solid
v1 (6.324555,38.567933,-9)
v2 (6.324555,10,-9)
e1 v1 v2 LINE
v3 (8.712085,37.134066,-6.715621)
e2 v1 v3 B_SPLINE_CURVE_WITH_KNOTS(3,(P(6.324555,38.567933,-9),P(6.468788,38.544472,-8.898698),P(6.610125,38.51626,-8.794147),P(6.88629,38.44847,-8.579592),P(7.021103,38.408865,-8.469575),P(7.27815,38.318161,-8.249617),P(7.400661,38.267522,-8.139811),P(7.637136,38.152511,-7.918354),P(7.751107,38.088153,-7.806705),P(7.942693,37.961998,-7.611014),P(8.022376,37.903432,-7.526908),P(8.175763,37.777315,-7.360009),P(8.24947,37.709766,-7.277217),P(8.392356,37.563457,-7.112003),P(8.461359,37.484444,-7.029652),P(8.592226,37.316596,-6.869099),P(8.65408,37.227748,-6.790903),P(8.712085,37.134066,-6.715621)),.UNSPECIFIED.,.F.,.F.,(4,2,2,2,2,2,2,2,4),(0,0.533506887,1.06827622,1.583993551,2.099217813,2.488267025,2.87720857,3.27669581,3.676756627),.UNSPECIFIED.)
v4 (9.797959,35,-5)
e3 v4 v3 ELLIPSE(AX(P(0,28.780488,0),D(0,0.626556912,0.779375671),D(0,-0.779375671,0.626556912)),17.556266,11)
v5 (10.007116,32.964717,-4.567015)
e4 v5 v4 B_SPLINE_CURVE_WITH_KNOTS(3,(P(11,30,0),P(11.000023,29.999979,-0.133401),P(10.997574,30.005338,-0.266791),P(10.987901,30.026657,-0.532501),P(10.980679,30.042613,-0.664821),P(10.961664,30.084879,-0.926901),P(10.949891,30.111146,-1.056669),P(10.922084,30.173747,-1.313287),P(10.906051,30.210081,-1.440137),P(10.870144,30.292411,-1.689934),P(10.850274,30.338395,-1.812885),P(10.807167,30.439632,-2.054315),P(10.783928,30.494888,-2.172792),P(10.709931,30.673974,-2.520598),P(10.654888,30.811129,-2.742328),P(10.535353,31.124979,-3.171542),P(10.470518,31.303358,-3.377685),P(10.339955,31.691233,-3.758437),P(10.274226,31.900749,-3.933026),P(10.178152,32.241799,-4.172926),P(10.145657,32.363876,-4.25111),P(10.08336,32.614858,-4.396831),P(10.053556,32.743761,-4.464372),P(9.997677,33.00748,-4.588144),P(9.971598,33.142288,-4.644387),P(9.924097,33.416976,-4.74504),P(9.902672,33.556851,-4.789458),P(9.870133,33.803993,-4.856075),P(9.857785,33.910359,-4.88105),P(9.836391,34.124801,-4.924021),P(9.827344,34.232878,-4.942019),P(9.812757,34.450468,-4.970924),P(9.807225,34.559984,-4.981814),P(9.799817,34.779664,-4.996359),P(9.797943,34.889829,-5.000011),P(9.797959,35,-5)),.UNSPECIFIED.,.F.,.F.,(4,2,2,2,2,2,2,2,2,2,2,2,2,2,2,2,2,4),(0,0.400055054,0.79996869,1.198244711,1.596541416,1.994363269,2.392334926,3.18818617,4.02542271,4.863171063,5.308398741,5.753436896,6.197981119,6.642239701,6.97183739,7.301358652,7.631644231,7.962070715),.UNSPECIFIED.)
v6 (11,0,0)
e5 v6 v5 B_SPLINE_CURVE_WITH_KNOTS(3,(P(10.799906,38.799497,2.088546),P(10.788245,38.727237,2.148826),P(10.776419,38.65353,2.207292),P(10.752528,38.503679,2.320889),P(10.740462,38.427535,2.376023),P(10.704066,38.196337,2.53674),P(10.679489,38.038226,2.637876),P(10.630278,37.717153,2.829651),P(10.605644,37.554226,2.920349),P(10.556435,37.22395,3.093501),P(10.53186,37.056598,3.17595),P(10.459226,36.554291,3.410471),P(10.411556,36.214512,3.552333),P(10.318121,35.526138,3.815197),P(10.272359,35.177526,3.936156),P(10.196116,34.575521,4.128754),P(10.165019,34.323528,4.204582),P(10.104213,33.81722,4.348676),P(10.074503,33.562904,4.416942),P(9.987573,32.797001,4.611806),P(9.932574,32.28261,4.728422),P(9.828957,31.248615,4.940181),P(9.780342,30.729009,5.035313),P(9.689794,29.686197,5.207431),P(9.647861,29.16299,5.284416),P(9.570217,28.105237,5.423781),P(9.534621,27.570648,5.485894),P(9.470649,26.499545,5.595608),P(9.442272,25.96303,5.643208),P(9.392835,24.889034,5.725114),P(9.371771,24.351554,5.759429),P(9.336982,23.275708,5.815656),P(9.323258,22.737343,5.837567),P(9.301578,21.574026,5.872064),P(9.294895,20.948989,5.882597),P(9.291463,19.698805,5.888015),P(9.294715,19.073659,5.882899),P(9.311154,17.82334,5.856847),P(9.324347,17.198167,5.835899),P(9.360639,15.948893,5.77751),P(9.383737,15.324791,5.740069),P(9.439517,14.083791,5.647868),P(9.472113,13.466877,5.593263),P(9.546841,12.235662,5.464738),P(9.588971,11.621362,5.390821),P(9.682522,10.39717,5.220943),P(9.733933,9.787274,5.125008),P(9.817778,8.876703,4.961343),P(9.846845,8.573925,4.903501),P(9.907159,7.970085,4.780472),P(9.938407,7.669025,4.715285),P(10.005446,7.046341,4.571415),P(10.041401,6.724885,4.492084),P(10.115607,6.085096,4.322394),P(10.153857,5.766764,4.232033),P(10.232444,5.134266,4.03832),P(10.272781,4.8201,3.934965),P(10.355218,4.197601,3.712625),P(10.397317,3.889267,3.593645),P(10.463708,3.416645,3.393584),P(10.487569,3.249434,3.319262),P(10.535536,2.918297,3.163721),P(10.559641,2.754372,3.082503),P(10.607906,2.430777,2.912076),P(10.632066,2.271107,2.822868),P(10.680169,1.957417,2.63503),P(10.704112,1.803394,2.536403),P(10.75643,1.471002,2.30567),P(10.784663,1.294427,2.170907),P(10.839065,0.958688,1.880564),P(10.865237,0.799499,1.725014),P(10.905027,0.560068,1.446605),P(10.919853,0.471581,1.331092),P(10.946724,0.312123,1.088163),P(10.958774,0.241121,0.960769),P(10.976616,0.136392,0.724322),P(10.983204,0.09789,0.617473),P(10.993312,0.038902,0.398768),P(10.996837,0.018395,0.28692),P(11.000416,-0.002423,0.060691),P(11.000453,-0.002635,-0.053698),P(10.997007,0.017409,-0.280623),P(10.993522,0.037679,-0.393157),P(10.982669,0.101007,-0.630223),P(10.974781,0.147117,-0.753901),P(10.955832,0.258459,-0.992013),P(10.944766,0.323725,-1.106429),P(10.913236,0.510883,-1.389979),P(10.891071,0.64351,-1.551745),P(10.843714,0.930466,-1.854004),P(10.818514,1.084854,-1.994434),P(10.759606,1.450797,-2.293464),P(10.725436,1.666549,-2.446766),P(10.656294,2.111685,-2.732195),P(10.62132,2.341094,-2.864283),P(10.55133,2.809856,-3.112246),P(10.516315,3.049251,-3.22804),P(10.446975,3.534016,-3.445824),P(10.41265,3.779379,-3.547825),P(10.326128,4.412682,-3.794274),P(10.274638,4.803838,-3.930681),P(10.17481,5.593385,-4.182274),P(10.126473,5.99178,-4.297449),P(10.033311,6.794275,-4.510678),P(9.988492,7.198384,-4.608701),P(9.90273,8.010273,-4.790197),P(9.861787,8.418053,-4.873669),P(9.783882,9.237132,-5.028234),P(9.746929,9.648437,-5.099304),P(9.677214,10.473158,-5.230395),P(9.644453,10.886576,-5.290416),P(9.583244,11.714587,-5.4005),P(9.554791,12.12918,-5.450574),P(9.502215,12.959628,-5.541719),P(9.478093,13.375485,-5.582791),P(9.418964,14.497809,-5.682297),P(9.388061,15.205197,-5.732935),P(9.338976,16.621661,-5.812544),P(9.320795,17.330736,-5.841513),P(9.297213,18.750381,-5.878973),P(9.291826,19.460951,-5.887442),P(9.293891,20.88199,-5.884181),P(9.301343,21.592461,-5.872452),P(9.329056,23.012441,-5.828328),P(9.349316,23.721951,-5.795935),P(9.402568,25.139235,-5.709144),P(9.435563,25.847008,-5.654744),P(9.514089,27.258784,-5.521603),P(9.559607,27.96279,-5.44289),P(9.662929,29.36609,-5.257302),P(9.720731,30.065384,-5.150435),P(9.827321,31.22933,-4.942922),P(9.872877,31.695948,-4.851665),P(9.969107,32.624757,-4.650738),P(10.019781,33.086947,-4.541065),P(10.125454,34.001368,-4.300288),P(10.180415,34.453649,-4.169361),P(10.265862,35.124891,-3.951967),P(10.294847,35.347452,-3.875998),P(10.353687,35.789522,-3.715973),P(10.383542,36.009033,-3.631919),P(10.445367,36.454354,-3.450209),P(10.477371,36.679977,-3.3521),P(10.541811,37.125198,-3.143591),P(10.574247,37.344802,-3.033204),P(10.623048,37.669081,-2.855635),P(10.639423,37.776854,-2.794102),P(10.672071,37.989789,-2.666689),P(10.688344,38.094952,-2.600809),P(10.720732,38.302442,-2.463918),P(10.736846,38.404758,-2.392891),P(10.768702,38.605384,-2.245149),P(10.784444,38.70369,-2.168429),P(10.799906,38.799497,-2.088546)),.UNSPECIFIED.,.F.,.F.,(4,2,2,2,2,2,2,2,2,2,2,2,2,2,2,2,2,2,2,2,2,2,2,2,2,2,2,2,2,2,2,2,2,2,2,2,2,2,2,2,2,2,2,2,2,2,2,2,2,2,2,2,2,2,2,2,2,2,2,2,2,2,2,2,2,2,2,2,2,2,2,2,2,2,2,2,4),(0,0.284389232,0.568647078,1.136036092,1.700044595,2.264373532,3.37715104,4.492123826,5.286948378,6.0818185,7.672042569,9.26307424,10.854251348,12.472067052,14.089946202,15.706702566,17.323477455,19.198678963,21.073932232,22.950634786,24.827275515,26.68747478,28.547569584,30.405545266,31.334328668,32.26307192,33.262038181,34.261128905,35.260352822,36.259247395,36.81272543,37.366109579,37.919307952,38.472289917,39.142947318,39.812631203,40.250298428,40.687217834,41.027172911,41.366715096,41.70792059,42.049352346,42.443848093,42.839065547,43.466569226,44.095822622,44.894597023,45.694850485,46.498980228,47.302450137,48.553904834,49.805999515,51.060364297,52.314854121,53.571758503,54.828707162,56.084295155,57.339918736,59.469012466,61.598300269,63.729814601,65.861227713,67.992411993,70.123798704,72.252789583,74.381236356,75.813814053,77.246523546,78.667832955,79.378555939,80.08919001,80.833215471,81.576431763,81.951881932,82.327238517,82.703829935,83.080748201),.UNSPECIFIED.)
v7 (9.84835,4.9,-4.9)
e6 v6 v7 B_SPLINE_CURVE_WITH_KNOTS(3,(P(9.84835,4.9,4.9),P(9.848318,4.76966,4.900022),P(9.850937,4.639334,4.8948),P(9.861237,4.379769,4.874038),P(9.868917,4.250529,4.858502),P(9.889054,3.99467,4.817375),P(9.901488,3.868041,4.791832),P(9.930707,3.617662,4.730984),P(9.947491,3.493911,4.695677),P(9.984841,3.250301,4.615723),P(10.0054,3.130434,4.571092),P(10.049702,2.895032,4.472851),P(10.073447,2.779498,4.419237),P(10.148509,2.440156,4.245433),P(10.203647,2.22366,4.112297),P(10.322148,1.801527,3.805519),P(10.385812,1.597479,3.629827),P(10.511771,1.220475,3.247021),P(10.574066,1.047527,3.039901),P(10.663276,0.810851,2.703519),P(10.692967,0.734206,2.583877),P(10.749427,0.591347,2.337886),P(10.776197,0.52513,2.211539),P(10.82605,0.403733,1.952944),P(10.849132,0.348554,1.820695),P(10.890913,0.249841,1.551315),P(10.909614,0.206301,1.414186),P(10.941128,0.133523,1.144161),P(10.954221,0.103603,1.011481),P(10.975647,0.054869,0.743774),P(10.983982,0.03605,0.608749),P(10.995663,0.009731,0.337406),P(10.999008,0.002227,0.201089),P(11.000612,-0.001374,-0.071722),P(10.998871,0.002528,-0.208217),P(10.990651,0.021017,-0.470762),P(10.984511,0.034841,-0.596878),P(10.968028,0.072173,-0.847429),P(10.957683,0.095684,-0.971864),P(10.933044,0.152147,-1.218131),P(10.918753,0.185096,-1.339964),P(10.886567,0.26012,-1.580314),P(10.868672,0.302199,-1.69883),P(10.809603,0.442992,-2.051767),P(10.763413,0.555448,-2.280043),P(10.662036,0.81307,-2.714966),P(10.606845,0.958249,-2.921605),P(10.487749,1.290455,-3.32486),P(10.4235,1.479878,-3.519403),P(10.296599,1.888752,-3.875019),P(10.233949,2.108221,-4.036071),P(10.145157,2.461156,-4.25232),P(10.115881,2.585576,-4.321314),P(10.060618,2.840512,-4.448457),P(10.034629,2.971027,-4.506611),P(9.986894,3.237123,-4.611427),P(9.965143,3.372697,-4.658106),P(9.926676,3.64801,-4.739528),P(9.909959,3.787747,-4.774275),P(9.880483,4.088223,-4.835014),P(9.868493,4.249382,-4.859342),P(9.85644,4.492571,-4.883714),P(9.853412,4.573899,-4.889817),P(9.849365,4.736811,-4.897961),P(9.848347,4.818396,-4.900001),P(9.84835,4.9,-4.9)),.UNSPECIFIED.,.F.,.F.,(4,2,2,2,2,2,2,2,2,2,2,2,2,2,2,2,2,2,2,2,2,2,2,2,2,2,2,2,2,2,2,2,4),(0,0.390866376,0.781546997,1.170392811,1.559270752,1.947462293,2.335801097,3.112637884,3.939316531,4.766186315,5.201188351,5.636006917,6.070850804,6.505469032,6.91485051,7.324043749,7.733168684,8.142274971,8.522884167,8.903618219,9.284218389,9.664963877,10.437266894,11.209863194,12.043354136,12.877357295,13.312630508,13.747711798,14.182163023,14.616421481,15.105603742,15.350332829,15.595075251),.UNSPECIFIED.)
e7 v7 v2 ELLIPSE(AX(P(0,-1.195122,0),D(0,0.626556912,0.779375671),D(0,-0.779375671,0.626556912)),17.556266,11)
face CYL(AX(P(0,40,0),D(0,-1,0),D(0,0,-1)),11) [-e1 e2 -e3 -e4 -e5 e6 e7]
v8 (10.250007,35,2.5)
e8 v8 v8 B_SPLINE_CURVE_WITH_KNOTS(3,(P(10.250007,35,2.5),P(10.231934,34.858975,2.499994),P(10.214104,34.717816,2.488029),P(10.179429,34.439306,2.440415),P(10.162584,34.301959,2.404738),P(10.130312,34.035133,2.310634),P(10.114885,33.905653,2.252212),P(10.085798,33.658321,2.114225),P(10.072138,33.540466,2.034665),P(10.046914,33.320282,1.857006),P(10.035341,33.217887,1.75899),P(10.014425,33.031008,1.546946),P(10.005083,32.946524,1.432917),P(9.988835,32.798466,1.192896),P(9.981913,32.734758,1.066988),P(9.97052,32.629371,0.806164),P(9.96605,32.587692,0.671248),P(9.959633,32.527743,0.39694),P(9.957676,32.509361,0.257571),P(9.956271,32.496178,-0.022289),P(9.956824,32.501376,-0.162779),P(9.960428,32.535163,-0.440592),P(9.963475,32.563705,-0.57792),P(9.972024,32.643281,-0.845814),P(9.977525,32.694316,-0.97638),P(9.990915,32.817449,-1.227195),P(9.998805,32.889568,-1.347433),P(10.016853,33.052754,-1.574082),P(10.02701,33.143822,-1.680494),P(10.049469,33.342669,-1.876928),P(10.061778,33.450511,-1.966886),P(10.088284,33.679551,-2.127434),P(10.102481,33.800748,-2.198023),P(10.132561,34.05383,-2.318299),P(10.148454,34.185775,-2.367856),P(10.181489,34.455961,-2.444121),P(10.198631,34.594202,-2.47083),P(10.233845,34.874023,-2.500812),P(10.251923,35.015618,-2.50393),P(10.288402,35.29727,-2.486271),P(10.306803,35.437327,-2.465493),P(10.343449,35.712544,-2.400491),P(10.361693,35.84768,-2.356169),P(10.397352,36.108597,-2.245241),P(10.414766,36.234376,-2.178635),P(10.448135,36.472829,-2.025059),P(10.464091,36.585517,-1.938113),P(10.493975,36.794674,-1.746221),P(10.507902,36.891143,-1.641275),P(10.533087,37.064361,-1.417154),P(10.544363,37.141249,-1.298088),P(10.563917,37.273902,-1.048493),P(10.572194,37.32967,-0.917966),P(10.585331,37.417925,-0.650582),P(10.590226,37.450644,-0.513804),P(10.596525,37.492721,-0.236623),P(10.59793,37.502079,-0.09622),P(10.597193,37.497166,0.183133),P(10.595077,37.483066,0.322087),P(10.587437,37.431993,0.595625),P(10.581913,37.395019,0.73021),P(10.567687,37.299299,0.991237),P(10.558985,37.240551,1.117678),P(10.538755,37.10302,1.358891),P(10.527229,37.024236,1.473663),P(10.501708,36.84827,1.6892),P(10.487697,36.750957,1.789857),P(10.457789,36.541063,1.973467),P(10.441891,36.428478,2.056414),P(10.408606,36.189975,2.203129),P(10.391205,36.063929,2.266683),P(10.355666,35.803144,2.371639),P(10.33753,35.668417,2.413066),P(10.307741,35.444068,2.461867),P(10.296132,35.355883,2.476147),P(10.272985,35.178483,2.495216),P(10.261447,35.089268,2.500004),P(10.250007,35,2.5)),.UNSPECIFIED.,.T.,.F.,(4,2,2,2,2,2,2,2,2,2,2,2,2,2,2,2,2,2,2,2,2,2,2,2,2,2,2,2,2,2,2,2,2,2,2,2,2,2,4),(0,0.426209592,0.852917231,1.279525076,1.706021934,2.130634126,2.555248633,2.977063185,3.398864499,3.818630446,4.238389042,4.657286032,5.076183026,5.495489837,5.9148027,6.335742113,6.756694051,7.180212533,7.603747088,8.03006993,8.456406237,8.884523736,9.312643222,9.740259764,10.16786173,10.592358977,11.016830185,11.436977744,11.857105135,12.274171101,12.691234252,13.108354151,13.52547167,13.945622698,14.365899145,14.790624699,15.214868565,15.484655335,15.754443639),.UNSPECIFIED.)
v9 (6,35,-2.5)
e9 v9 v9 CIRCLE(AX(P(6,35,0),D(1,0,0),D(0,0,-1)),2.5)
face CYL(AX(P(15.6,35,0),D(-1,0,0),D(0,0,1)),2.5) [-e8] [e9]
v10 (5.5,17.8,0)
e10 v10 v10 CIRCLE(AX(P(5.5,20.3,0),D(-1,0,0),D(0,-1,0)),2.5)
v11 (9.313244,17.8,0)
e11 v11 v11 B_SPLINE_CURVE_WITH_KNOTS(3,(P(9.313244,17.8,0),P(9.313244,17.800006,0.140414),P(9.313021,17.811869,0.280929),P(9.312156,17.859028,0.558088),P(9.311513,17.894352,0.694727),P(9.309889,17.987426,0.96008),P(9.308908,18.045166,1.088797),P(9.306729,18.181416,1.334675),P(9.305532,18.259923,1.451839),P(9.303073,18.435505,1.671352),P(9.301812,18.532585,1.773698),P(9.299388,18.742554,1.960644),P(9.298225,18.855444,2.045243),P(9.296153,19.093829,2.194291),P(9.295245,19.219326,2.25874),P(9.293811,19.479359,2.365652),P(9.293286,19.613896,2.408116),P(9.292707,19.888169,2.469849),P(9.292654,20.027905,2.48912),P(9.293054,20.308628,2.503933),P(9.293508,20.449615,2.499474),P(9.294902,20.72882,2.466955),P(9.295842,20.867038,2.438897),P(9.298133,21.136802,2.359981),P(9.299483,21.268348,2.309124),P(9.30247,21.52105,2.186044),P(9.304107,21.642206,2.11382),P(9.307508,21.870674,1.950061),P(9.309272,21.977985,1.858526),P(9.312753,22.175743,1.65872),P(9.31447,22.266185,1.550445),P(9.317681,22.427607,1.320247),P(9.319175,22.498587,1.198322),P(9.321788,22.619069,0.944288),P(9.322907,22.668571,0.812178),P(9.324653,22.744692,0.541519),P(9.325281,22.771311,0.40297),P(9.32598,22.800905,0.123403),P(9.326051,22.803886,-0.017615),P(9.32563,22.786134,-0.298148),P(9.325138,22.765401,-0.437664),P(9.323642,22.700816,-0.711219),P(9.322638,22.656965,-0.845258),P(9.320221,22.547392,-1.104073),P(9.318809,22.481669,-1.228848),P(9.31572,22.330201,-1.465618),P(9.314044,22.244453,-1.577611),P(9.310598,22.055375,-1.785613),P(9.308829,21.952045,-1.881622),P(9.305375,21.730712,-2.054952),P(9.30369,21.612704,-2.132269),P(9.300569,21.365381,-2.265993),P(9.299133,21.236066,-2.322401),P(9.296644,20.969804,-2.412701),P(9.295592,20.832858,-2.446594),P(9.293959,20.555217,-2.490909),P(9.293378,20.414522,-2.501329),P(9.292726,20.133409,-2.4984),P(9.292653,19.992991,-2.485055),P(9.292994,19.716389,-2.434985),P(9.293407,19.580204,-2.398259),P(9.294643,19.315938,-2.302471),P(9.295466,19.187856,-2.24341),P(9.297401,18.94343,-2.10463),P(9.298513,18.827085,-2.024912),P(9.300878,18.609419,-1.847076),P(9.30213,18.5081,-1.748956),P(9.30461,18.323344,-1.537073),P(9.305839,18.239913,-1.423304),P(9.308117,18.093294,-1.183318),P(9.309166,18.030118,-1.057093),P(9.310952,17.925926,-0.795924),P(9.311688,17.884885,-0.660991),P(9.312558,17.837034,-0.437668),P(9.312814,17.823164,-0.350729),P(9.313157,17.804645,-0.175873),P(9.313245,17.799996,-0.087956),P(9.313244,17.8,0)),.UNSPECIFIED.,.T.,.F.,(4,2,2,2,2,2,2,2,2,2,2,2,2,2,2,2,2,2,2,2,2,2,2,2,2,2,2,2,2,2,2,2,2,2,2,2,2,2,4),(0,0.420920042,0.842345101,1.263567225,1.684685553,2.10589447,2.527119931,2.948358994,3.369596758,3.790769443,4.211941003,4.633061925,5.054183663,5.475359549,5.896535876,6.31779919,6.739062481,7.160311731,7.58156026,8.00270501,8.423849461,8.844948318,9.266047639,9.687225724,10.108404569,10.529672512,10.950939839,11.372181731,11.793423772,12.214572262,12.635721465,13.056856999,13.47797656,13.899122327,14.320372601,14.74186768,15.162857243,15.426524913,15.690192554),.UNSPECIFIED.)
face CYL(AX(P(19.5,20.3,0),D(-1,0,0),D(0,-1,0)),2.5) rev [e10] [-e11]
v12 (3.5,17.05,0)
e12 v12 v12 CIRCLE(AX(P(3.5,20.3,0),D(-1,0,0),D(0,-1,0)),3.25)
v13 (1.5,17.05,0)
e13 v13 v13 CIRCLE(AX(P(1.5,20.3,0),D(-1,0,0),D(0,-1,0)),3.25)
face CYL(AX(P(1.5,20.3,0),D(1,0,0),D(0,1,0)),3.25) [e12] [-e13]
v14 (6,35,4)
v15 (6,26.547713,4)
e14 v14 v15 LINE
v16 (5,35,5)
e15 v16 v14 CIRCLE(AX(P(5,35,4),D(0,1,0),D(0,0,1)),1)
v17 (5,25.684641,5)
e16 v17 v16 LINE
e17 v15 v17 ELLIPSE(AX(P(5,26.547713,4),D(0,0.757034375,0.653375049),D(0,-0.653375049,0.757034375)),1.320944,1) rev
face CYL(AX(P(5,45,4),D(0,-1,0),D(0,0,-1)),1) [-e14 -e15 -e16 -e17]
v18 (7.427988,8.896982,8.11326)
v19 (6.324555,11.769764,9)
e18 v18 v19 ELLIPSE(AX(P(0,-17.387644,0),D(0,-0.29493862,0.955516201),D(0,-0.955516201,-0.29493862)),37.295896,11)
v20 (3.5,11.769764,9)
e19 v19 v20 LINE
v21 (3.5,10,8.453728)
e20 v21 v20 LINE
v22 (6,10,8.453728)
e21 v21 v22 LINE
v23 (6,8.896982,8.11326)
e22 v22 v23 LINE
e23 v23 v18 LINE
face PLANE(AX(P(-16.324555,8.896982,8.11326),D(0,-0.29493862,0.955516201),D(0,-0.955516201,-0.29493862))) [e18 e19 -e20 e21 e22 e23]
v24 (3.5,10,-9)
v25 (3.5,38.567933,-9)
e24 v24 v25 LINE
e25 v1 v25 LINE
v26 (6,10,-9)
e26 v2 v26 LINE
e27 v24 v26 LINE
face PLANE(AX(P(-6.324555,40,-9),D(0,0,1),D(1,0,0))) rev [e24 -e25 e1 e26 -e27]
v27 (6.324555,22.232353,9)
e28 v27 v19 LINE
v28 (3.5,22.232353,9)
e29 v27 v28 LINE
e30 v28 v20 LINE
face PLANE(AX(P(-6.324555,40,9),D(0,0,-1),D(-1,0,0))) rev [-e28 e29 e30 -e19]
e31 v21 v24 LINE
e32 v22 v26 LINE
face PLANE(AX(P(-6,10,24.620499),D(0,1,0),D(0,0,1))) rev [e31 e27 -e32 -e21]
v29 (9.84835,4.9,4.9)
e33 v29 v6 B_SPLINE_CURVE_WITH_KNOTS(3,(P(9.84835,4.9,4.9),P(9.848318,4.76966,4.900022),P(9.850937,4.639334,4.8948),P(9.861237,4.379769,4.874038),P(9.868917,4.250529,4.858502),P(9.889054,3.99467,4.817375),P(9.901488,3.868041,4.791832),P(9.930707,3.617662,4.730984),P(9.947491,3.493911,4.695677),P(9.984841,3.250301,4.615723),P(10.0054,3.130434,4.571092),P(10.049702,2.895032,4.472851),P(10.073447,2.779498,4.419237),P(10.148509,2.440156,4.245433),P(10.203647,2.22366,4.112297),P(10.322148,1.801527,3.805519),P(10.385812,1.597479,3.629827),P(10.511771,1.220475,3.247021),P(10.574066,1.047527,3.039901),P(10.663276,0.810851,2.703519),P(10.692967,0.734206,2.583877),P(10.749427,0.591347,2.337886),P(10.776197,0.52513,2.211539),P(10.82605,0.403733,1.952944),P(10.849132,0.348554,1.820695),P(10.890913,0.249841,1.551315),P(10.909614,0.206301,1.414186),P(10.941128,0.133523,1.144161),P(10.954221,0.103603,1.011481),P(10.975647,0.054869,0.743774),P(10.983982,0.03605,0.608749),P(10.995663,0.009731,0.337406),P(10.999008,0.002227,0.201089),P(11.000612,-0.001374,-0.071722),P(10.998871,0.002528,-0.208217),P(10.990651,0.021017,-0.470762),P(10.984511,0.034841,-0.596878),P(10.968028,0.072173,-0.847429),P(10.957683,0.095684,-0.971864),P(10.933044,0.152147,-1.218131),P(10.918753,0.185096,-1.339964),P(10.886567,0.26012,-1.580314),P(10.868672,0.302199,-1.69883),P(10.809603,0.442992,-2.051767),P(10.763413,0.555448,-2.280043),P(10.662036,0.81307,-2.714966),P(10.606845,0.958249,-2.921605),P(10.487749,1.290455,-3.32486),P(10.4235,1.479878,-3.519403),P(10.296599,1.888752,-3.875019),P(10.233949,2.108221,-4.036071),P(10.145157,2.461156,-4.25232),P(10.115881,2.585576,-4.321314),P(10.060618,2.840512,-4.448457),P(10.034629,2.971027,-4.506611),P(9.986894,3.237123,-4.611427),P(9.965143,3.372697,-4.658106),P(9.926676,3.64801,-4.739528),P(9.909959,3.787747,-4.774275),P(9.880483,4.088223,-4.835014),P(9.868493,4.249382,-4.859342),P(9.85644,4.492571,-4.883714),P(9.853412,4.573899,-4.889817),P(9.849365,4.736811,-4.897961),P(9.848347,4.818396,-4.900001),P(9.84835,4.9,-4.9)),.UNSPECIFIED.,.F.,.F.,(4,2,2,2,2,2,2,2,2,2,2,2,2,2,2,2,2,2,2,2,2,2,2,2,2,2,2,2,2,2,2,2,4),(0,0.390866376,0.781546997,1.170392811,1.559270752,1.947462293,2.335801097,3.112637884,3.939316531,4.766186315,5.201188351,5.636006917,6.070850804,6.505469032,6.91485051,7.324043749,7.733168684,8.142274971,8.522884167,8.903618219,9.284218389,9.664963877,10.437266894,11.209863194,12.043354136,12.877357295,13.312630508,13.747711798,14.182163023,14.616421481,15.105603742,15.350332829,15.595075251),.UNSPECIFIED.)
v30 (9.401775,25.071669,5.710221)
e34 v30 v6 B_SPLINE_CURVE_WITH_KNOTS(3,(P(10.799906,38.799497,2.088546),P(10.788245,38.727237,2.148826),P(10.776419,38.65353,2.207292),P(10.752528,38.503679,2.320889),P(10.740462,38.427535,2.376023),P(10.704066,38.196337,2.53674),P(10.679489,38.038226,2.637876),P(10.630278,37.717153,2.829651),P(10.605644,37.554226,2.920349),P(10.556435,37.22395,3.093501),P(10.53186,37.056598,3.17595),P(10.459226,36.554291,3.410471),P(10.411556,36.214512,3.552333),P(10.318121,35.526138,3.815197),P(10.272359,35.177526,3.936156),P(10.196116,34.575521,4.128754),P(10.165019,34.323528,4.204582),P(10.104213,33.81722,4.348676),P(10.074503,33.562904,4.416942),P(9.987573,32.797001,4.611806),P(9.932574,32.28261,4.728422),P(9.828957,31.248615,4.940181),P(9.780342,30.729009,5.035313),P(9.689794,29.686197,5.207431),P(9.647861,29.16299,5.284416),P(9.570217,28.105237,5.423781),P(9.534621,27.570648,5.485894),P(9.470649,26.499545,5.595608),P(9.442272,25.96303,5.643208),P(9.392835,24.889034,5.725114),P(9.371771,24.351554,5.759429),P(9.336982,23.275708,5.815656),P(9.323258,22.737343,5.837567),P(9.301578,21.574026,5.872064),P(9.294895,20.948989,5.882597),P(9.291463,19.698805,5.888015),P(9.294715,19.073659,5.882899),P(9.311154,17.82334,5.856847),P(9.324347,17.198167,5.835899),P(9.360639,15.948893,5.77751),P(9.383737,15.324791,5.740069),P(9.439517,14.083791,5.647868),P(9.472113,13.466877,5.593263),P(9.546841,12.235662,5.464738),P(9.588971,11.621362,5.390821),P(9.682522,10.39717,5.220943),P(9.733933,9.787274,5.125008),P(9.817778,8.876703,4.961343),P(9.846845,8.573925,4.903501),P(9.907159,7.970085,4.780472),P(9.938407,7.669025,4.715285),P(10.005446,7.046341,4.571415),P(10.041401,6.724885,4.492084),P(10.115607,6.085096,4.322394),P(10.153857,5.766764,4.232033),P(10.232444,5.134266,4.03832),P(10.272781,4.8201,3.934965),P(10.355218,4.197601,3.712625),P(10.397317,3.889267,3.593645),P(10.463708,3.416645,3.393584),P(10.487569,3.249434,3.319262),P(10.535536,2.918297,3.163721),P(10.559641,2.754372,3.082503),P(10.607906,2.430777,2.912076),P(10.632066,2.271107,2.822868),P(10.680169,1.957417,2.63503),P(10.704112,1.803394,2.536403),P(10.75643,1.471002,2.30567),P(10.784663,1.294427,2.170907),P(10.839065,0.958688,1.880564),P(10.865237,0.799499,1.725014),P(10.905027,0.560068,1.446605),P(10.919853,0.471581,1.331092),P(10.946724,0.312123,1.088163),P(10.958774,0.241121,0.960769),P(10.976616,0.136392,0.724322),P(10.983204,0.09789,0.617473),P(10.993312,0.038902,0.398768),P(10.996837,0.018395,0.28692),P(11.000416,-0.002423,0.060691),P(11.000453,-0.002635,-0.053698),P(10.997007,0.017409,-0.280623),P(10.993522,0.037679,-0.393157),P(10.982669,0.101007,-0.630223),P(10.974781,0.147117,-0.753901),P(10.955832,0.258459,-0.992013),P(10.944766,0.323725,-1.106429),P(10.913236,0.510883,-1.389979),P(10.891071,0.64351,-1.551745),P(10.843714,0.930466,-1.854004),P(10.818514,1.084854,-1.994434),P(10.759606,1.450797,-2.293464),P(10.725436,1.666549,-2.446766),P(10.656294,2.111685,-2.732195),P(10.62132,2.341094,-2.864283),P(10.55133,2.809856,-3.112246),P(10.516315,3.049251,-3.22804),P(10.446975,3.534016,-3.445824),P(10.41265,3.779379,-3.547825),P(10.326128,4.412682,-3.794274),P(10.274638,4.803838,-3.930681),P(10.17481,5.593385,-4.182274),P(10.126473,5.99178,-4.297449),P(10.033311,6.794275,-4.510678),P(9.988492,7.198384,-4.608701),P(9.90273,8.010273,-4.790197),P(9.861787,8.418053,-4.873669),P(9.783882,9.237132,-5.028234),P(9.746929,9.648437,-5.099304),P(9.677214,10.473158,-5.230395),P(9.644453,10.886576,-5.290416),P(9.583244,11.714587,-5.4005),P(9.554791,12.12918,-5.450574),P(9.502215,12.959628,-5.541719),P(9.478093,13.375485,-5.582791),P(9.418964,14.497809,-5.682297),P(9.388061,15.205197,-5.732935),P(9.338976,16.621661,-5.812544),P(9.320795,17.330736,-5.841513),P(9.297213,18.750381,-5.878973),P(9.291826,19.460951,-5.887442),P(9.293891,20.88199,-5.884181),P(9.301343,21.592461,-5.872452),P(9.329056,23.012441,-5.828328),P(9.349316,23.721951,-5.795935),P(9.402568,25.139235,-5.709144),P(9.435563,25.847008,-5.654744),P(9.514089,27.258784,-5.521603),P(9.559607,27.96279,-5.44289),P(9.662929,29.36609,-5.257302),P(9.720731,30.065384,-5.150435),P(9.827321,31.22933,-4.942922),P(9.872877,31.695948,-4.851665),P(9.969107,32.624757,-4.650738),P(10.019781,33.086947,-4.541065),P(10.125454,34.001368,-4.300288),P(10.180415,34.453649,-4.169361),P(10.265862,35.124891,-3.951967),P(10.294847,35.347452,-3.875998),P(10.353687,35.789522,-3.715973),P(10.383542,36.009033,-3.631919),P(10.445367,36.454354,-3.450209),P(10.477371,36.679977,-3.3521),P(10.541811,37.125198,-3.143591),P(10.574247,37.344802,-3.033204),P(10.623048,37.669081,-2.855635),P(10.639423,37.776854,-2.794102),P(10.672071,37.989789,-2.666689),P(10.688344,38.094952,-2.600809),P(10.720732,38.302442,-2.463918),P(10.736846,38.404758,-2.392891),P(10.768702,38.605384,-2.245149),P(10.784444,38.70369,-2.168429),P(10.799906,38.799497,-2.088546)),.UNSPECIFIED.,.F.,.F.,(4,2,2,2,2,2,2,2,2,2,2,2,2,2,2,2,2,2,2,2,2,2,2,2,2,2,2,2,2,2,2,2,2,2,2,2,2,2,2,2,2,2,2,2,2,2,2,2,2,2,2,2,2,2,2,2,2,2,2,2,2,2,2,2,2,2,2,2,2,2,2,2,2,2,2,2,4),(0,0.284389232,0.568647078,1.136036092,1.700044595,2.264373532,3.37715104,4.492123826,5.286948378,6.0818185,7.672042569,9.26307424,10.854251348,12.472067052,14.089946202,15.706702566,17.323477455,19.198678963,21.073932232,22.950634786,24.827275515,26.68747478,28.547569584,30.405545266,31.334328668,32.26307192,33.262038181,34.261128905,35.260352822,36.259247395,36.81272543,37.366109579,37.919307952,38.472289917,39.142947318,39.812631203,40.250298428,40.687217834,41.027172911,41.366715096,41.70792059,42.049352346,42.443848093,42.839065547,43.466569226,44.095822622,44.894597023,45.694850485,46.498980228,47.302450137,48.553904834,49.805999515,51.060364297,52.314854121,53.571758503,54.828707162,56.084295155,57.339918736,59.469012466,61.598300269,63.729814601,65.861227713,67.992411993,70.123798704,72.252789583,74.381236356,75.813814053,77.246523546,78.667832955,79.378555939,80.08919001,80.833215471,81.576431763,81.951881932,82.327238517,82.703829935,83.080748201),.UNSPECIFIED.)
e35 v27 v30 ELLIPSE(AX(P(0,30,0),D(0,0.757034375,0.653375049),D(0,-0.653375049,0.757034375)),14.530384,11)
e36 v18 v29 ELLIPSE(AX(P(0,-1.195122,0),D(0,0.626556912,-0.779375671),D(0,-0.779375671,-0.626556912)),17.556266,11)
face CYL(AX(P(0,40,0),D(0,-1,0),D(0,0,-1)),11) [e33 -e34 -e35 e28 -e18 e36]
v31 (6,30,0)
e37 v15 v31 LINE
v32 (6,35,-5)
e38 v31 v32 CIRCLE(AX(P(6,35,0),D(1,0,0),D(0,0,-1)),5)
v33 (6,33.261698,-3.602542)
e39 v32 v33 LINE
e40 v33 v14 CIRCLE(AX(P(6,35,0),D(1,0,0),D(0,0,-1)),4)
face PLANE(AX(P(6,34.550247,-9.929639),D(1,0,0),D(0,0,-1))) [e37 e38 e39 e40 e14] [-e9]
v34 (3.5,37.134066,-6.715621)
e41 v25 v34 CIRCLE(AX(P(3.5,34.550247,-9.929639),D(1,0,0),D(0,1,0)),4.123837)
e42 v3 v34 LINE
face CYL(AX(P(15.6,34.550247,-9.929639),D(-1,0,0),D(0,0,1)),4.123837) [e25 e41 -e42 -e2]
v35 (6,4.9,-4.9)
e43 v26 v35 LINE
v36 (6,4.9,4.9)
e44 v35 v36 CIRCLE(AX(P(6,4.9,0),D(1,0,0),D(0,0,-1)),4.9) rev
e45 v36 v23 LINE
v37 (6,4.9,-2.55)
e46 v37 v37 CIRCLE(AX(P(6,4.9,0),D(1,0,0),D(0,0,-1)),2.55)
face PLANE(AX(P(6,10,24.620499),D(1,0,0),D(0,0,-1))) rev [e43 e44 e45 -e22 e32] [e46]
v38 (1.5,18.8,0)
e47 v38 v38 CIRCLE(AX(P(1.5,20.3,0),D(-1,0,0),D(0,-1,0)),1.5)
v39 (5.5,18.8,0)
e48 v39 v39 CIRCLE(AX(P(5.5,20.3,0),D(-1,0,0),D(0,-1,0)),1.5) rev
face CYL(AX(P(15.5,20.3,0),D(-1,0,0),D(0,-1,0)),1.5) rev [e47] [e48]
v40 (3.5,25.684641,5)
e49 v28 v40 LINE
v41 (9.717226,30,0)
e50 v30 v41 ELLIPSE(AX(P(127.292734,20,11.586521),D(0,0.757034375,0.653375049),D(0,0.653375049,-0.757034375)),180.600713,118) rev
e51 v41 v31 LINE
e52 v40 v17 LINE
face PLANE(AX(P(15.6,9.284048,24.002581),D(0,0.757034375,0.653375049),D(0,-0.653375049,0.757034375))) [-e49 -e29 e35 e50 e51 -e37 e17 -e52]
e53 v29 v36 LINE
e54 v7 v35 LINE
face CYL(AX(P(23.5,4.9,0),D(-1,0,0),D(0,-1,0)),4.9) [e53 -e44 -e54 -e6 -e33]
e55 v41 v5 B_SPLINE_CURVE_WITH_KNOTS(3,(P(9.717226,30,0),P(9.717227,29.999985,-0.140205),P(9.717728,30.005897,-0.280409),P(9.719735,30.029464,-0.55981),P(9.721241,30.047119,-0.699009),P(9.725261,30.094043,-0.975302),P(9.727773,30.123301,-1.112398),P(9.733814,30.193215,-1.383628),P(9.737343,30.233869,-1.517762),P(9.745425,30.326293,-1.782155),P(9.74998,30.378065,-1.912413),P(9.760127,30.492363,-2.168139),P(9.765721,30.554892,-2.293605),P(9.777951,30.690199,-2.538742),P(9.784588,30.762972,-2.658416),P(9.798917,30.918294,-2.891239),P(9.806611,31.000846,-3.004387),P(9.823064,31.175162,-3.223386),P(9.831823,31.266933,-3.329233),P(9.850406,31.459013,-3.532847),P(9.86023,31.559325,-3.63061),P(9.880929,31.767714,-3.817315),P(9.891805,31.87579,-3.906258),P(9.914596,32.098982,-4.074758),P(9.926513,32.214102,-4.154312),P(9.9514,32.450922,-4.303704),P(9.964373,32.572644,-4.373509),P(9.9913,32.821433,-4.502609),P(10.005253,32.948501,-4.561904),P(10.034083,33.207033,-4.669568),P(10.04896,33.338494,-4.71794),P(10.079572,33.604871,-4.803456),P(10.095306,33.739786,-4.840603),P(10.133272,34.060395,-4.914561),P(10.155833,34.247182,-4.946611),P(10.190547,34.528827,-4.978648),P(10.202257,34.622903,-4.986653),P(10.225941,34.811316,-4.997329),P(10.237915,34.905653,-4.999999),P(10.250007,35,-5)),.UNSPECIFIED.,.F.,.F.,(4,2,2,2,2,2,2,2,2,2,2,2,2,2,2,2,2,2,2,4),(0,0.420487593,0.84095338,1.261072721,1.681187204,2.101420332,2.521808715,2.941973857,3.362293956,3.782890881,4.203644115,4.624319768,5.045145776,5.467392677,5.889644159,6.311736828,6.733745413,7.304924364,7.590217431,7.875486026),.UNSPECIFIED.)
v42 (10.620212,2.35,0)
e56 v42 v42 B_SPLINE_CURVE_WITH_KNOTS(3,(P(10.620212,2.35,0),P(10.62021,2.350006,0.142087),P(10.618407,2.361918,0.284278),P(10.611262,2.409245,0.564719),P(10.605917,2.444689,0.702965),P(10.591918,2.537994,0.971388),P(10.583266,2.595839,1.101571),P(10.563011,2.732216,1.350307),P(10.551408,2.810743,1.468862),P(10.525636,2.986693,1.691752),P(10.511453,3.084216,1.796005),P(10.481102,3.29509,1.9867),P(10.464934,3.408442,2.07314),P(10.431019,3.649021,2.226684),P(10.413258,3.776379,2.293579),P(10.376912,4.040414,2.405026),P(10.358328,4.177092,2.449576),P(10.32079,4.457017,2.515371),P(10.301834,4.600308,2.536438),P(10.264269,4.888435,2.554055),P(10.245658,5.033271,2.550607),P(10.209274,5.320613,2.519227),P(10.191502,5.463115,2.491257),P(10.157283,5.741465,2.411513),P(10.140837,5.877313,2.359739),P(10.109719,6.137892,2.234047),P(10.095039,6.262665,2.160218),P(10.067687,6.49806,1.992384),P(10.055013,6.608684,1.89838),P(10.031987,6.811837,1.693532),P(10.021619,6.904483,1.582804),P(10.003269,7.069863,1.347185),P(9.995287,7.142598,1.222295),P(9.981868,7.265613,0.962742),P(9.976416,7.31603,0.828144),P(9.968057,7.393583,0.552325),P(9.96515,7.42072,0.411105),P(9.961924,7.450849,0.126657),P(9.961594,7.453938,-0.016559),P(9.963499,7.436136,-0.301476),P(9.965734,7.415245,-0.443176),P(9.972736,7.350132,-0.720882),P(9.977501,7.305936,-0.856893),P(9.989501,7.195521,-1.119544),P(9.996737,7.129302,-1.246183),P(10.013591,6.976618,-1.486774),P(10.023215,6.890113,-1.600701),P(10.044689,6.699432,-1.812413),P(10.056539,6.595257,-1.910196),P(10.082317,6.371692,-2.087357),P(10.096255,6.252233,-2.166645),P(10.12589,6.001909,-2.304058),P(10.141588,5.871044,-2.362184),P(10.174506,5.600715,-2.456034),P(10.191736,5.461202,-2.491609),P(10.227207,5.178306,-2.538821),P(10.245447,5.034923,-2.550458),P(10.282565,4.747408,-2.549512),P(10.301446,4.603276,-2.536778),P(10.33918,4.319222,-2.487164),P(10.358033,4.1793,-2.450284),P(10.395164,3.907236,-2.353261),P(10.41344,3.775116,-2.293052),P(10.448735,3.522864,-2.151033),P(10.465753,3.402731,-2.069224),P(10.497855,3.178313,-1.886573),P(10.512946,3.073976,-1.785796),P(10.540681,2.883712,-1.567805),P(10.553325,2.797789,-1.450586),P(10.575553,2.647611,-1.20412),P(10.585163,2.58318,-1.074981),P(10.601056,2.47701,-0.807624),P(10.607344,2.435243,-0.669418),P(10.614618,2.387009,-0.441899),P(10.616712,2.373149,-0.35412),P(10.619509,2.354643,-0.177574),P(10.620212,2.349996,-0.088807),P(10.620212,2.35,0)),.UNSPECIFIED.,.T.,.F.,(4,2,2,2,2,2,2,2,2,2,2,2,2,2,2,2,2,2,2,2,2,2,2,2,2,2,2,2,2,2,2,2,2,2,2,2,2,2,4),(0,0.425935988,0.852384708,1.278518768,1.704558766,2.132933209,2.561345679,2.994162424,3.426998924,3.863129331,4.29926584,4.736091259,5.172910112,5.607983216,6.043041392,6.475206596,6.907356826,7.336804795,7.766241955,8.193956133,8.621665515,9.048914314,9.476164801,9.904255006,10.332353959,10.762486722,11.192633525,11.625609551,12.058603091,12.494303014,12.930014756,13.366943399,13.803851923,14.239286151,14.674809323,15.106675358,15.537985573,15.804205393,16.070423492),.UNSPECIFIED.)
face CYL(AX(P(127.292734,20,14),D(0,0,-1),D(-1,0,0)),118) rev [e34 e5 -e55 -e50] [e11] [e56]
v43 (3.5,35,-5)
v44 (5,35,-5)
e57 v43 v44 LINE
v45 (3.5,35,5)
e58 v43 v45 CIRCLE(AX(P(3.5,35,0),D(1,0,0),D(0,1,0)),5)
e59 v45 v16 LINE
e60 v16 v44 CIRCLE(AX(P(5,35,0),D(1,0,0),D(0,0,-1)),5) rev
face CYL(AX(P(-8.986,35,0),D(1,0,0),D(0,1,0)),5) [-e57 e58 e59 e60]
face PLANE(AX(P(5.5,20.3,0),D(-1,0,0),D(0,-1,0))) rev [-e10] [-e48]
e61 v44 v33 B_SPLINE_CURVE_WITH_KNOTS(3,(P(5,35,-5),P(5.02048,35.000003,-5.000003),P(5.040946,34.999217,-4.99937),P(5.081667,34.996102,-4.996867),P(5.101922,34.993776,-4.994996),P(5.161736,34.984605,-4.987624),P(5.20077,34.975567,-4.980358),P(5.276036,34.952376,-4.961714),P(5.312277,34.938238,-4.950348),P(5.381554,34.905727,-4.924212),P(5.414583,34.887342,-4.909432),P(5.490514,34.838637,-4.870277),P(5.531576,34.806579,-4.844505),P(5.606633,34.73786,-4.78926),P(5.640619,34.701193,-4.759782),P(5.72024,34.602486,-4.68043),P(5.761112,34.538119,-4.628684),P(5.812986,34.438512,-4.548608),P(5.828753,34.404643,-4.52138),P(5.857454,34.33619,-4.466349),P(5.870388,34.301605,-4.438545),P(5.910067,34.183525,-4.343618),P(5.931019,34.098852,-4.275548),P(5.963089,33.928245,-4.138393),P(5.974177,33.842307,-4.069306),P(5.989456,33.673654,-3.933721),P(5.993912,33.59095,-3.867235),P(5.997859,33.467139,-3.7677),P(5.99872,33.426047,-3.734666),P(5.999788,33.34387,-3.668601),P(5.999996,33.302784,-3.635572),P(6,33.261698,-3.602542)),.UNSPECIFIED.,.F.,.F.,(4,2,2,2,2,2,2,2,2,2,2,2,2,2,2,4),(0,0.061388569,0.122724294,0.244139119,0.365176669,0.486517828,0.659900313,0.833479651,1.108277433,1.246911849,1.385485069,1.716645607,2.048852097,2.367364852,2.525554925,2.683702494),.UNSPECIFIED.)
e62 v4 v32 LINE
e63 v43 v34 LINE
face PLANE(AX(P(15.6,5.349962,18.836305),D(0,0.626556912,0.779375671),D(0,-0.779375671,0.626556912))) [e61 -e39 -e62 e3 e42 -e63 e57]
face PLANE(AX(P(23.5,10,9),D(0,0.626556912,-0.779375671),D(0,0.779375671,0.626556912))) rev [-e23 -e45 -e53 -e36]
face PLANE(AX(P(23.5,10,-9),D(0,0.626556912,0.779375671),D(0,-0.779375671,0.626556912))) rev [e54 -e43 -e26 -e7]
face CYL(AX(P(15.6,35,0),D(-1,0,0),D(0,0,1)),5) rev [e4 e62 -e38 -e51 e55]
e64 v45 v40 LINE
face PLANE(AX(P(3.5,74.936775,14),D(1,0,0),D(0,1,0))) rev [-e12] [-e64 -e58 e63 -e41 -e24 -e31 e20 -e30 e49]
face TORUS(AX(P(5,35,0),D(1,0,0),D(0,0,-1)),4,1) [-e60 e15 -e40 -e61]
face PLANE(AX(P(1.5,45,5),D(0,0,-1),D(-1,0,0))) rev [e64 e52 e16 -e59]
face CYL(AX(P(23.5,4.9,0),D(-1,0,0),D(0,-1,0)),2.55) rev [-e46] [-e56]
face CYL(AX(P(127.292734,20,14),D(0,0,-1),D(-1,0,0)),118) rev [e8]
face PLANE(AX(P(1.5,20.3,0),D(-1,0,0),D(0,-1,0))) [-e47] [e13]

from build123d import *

# Parameters (mm, degrees)
BOSS_EXTRUDE1_DEPTH      = 40
CUT_EXTRUDE1_DEPTH       = 45
CUT_EXTRUDE2_REACH       = 47.222
SKETCH3_W                = 12
SKETCH3_H                = 10
SKETCH4_R                = 2.55
CUT_EXTRUDE3_DEPTH       = 17.5
FILLET4_R                = 2
CUT_EXTRUDE5_START       = -12.324555
SKETCH6_R                = 2.5
CUT_EXTRUDE5_DEPTH       = 9.6
CUT_EXTRUDE6_START       = 6.279445
SKETCH6_3_R              = 2.5
CUT_EXTRUDE6_DEPTH       = 6.604
CUT_EXTRUDE7_START       = -14.986
CUT_EXTRUDE7_DEPTH       = 14.986
CUT_EXTRUDE14_DEPTH      = 10
CUT_EXTRUDE14_DEPTH_BACK = 20
FILLET3_R                = 1
CUT_EXTRUDE17_DEPTH      = 9
CUT_EXTRUDE17_DEPTH_BACK = 31
SKETCH19_W               = 34.391960709
SKETCH19_H               = 80.468832088
SKETCH20_R               = 3.25
BOSS_EXTRUDE2_DEPTH      = 2
SKETCH21_R               = 1.5
CUT_EXTRUDE18_DEPTH      = 14
CUT_EXTRUDE19_START      = -4
SKETCH22_R               = 2.5
CUT_EXTRUDE19_DEPTH      = 14
CUT_EXTRUDE20_DEPTH      = 14
CUT_EXTRUDE20_DEPTH_BACK = 14


with BuildPart() as part:
    # Sketch1 → Boss-Extrude1 (new body)
    with BuildSketch(Plane(origin=(0, 0, 0), x_dir=(1, 0, 0), z_dir=(0, 1, 0))):
        with BuildLine():
            Line((-6.32455532, 9), (6.32455532, 9))
            ThreePointArc((6.32455532, 9), (11, 0), (6.32455532, -9))
            Line((6.32455532, -9), (-6.32455532, -9))
            ThreePointArc((-6.32455532, -9), (-11, 0), (-6.32455532, 9))
        make_face()
    extrude(amount=BOSS_EXTRUDE1_DEPTH)

    # Sketch2 → Cut-Extrude1 (cut)
    with BuildSketch(Plane.XZ):
        with BuildLine():
            Line((1.5, 5), (-1.5, 5))
            ThreePointArc((-1.5, 5), (0, 6.5), (1.5, 5))
        make_face()
        with BuildLine():
            Line((1.5, -5), (-1.5, -5))
            ThreePointArc((-1.5, -5), (0, -6.5), (1.5, -5))
        make_face()
    extrude(amount=-CUT_EXTRUDE1_DEPTH, mode=Mode.SUBTRACT)

    # Cut-Extrude2: up to this face of the body (flat: up to its plane)
    cut_extrude2_end = Plane(part.part.faces().sort_by_distance((0, 20, 9))[0])
    # Sketch3 → Cut-Extrude2 (cut, up to the picked face)
    with BuildSketch(Plane(origin=(0, 0, -9), x_dir=(-1, 0, 0), z_dir=(0, 0, -1)), mode=Mode.PRIVATE) as cut_extrude2_sk1:
        with Locations((0, 5)):
            Rectangle(SKETCH3_W, SKETCH3_H)
    cut_extrude2_tool1 = split(extrude(cut_extrude2_sk1.sketch, amount=-CUT_EXTRUDE2_REACH, mode=Mode.PRIVATE), bisect_by=cut_extrude2_end, keep=Keep.BOTH, mode=Mode.PRIVATE)
    add(cut_extrude2_tool1.solids().sort_by(Axis((0, 5, -9), (0, 0, 1)))[0], mode=Mode.SUBTRACT)

    # Sketch4 → Cut-Extrude3 (cut, symmetric)
    with BuildSketch(Plane.ZY.offset(-6)):
        with Locations(Location((0, 4.9, 0), (0, 0, 270))):
            Circle(SKETCH4_R)
        with BuildLine():
            Line((-9, 10), (-4.9, 4.9))
            ThreePointArc((-4.9, 4.9), (0, 0), (4.9, 4.9))
            Line((4.9, 4.9), (9, 10))
            Line((9, 10), (12.043777938, -1.930413563))
            Line((12.043777938, -1.930413563), (-10.290438773, -1.930413563))
            Line((-10.290438773, -1.930413563), (-9, 10))
        make_face()
    extrude(amount=CUT_EXTRUDE3_DEPTH, both=True, mode=Mode.SUBTRACT)

    # Fillet4
    fillet4_edges = [part.edges().sort_by_distance(p)[0] for p in [
        (0, 10, 5),
        (0, 10, 6.5),
        (0, 10, -5),
        (0, 10, -6.5),
    ]]
    fillet(fillet4_edges, radius=FILLET4_R)

    # Sketch6 → Cut-Extrude5 (cut)
    with BuildSketch(Plane.ZY.offset(6.32455532).offset(CUT_EXTRUDE5_START)):
        with BuildLine():
            Line((9, 22.232353468), (0, 30))
            ThreePointArc((0, 30), (-3.535533906, 31.464466094), (-5, 35))
            Line((-5, 35), (-6.715621335, 37.134065563))
            ThreePointArc((-6.715621335, 37.134065563), (-7.737273484, 38.043034193), (-9, 38.567933069))
            Line((-9, 38.567933069), (-20.985236203, 70.297327945))
            Line((-20.985236203, 70.297327945), (29.827478779, 37.594689174))
            Line((29.827478779, 37.594689174), (9, 22.232353468))
        make_face()
        with Locations((0, 35)):
            Circle(SKETCH6_R, mode=Mode.SUBTRACT)
    extrude(amount=-CUT_EXTRUDE5_DEPTH, mode=Mode.SUBTRACT)

    # Sketch6<3> → Cut-Extrude6 (cut)
    with BuildSketch(Plane.ZY.offset(6.32455532).offset(CUT_EXTRUDE6_START)):
        with BuildLine():
            Line((9, 22.232353468), (0, 30))
            ThreePointArc((0, 30), (-3.535533906, 31.464466094), (-5, 35))
            Line((-5, 35), (-6.715621335, 37.134065563))
            ThreePointArc((-6.715621335, 37.134065563), (-7.737273484, 38.043034193), (-9, 38.567933069))
            Line((-9, 38.567933069), (-20.985236203, 70.297327945))
            Line((-20.985236203, 70.297327945), (29.827478779, 37.594689174))
            Line((29.827478779, 37.594689174), (9, 22.232353468))
        make_face()
        with Locations((0, 35)):
            Circle(SKETCH6_3_R, mode=Mode.SUBTRACT)
    extrude(amount=-CUT_EXTRUDE6_DEPTH, mode=Mode.SUBTRACT)

    # Sketch7 → Cut-Extrude7 (cut)
    with BuildSketch(Plane(origin=(6, 0, 0), x_dir=(0, 0, -1), z_dir=(1, 0, 0)).offset(CUT_EXTRUDE7_START)):
        with BuildLine():
            Line((5, 35), (6.715621335, 37.134065563))
            ThreePointArc((6.715621335, 37.134065563), (7.737273484, 38.043034193), (9, 38.567933069))
            Line((9, 38.567933069), (17.905522107, 46.18977372))
            Line((17.905522107, 46.18977372), (-20.628346566, 40.15215478))
            Line((-20.628346566, 40.15215478), (-9, 22.232353468))
            Line((-9, 22.232353468), (-5, 25.684640815))
            Line((-5, 25.684640815), (-5, 35))
            ThreePointArc((-5, 35), (0, 40), (5, 35))
        make_face()
    extrude(amount=CUT_EXTRUDE7_DEPTH, mode=Mode.SUBTRACT)

    # Sketch16 → Cut-Extrude14 (cut, two sides: drawn at the far end of the back side and taken through both)
    with BuildSketch(Plane.ZY.offset(6.32455532).offset(-CUT_EXTRUDE14_DEPTH_BACK)):
        Polygon((8.113259987, 8.896981935), (11.550119513, 20.031417135), (18.056002312, 15.695207893), (16.156055326, 2.281594324), align=None)
    extrude(amount=CUT_EXTRUDE14_DEPTH + CUT_EXTRUDE14_DEPTH_BACK, mode=Mode.SUBTRACT)

    # Fillet3
    # the kernel refuses this fillet: 1 mm, written as the material it takes off along each edge
    with BuildSketch(Plane(origin=(5.99999968, 23.184640014, 5), x_dir=(-1, 0, 0), z_dir=(0, 1, 0))) as fillet3_piece_1_section:
        with BuildLine():
            CenterArc((FILLET3_R, -FILLET3_R), FILLET3_R, 90, 90)
            Line((0, -FILLET3_R), (0, 0))
            Line((0, 0), (FILLET3_R, 0))
        make_face()
    fillet3_piece_1 = extrude(amount=11.815359986, mode=Mode.PRIVATE)
    fillet3_piece_1 = split(fillet3_piece_1, bisect_by=Plane(origin=(5.764976342, 27.542151825, 2.84779096), z_dir=(0, 0.7570343753275036, 0.6533750489362878)), keep=Keep.TOP, mode=Mode.PRIVATE)
    add(fillet3_piece_1, mode=Mode.SUBTRACT)
    with BuildSketch(Plane(origin=(6, 35, 0), x_dir=(0, 0, 1), z_dir=(0, -1, 0))) as fillet3_piece_2_section:
        with BuildLine():
            CenterArc((4, 1.00000032), FILLET3_R, 270, 90)
            ThreePointArc((4, 3.2e-07), (4.5, 3.2e-07), (5, 0))
            Line((5, 0), (5, 1.00000032))
        make_face()
    fillet3_piece_2 = revolve(axis=Axis((6, 35, 0), (-1, 0, 0)), revolution_arc=208.693968336, mode=Mode.PRIVATE)
    fillet3_piece_2 = split(fillet3_piece_2, bisect_by=Plane(origin=(5.717618036, 35.865387036, -5.695703303), z_dir=(0, 0.6265569118246621, 0.7793756708062823)), keep=Keep.TOP, mode=Mode.PRIVATE)
    add(fillet3_piece_2, mode=Mode.SUBTRACT)
    with BuildSketch(Plane(origin=(-6.00000032, 35, 0), x_dir=(0, -0.48013104288571345, -0.8771967747646346), z_dir=(0, -0.8771967747646346, 0.48013104288571345))) as fillet3_piece_3_section:
        with BuildLine():
            CenterArc((5 - FILLET3_R, FILLET3_R), FILLET3_R, 270, 90)
            Line((5 - FILLET3_R, 0), (5, 0))
            Line((5, 0), (5, FILLET3_R))
        make_face()
    fillet3_piece_3 = revolve(axis=Axis((-6.00000032, 35, 0), (1, 0, 0)), revolution_arc=208.69396098, mode=Mode.PRIVATE)
    fillet3_piece_3 = split(fillet3_piece_3, bisect_by=Plane(origin=(-5.717618693, 35.865387047, -5.695703312), z_dir=(0, 0.6265569118246621, 0.7793756708062823)), keep=Keep.TOP, mode=Mode.PRIVATE)
    add(fillet3_piece_3, mode=Mode.SUBTRACT)
    with BuildSketch(Plane(origin=(-6.00000032, 35, 5), x_dir=(0, 0, -1), z_dir=(0, -1, 0))) as fillet3_piece_4_section:
        with BuildLine():
            CenterArc((FILLET3_R, FILLET3_R), FILLET3_R, 180, 90)
            Line((0, FILLET3_R), (0, 0))
            Line((0, 0), (FILLET3_R, 0))
        make_face()
    fillet3_piece_4 = extrude(amount=11.815359185, mode=Mode.PRIVATE)
    fillet3_piece_4 = split(fillet3_piece_4, bisect_by=Plane(origin=(-5.831638788, 29.468233541, 0.616132326), z_dir=(0, 0.7570343753275036, 0.6533750489362878)), keep=Keep.TOP, mode=Mode.PRIVATE)
    add(fillet3_piece_4, mode=Mode.SUBTRACT)

    # Sketch19 → Cut-Extrude17 (cut, two sides: drawn at the far end of the back side and taken through both)
    with BuildSketch(Plane.XY.offset(5).offset(-CUT_EXTRUDE17_DEPTH_BACK)):
        with Locations((-13.695980355, 34.702359308)):
            Rectangle(SKETCH19_W, SKETCH19_H)
    extrude(amount=CUT_EXTRUDE17_DEPTH + CUT_EXTRUDE17_DEPTH_BACK, mode=Mode.SUBTRACT)

    # Sketch20 → Boss-Extrude2 (add)
    with BuildSketch(Plane.ZY.offset(-3.5)):
        with Locations(Location((0, 20.3, 0), (0, 0, 270))):
            Circle(SKETCH20_R)
    extrude(amount=BOSS_EXTRUDE2_DEPTH)

    # Sketch21 → Cut-Extrude18 (cut)
    with BuildSketch(Plane.ZY.offset(-1.5)):
        with Locations(Location((0, 20.3, 0), (0, 0, 270))):
            Circle(SKETCH21_R)
    extrude(amount=-CUT_EXTRUDE18_DEPTH, mode=Mode.SUBTRACT)

    # Sketch22 → Cut-Extrude19 (cut)
    with BuildSketch(Plane.ZY.offset(-1.5).offset(CUT_EXTRUDE19_START)):
        with Locations(Location((0, 20.3, 0), (0, 0, 270))):
            Circle(SKETCH22_R)
    extrude(amount=-CUT_EXTRUDE19_DEPTH, mode=Mode.SUBTRACT)

    # Sketch17 → Cut-Extrude20 (cut, two sides: drawn at the far end of the back side and taken through both)
    with BuildSketch(Plane.XY.offset(-CUT_EXTRUDE20_DEPTH_BACK)):
        with BuildLine():
            Line((11, 0), (25.575472319, 70.054686952))
            Line((25.575472319, 70.054686952), (-19.116979593, 73.080460091))
            Line((-19.116979593, 73.080460091), (-22.103338511, 10.056999989))
            Line((-22.103338511, 10.056999989), (-11, 0))
            ThreePointArc((-11, 0), (-9.292734081, 20), (-11, 40))
            Line((-11, 40), (-11, 54.709335657))
            Line((-11, 54.709335657), (1.039161205, 61.782229983))
            Line((1.039161205, 61.782229983), (17.277292868, 53.927851901))
            Line((17.277292868, 53.927851901), (11, 40))
            ThreePointArc((11, 40), (9.292734081, 20), (11, 0))
        make_face()
    extrude(amount=CUT_EXTRUDE20_DEPTH + CUT_EXTRUDE20_DEPTH_BACK, mode=Mode.SUBTRACT)


solid = part.part
